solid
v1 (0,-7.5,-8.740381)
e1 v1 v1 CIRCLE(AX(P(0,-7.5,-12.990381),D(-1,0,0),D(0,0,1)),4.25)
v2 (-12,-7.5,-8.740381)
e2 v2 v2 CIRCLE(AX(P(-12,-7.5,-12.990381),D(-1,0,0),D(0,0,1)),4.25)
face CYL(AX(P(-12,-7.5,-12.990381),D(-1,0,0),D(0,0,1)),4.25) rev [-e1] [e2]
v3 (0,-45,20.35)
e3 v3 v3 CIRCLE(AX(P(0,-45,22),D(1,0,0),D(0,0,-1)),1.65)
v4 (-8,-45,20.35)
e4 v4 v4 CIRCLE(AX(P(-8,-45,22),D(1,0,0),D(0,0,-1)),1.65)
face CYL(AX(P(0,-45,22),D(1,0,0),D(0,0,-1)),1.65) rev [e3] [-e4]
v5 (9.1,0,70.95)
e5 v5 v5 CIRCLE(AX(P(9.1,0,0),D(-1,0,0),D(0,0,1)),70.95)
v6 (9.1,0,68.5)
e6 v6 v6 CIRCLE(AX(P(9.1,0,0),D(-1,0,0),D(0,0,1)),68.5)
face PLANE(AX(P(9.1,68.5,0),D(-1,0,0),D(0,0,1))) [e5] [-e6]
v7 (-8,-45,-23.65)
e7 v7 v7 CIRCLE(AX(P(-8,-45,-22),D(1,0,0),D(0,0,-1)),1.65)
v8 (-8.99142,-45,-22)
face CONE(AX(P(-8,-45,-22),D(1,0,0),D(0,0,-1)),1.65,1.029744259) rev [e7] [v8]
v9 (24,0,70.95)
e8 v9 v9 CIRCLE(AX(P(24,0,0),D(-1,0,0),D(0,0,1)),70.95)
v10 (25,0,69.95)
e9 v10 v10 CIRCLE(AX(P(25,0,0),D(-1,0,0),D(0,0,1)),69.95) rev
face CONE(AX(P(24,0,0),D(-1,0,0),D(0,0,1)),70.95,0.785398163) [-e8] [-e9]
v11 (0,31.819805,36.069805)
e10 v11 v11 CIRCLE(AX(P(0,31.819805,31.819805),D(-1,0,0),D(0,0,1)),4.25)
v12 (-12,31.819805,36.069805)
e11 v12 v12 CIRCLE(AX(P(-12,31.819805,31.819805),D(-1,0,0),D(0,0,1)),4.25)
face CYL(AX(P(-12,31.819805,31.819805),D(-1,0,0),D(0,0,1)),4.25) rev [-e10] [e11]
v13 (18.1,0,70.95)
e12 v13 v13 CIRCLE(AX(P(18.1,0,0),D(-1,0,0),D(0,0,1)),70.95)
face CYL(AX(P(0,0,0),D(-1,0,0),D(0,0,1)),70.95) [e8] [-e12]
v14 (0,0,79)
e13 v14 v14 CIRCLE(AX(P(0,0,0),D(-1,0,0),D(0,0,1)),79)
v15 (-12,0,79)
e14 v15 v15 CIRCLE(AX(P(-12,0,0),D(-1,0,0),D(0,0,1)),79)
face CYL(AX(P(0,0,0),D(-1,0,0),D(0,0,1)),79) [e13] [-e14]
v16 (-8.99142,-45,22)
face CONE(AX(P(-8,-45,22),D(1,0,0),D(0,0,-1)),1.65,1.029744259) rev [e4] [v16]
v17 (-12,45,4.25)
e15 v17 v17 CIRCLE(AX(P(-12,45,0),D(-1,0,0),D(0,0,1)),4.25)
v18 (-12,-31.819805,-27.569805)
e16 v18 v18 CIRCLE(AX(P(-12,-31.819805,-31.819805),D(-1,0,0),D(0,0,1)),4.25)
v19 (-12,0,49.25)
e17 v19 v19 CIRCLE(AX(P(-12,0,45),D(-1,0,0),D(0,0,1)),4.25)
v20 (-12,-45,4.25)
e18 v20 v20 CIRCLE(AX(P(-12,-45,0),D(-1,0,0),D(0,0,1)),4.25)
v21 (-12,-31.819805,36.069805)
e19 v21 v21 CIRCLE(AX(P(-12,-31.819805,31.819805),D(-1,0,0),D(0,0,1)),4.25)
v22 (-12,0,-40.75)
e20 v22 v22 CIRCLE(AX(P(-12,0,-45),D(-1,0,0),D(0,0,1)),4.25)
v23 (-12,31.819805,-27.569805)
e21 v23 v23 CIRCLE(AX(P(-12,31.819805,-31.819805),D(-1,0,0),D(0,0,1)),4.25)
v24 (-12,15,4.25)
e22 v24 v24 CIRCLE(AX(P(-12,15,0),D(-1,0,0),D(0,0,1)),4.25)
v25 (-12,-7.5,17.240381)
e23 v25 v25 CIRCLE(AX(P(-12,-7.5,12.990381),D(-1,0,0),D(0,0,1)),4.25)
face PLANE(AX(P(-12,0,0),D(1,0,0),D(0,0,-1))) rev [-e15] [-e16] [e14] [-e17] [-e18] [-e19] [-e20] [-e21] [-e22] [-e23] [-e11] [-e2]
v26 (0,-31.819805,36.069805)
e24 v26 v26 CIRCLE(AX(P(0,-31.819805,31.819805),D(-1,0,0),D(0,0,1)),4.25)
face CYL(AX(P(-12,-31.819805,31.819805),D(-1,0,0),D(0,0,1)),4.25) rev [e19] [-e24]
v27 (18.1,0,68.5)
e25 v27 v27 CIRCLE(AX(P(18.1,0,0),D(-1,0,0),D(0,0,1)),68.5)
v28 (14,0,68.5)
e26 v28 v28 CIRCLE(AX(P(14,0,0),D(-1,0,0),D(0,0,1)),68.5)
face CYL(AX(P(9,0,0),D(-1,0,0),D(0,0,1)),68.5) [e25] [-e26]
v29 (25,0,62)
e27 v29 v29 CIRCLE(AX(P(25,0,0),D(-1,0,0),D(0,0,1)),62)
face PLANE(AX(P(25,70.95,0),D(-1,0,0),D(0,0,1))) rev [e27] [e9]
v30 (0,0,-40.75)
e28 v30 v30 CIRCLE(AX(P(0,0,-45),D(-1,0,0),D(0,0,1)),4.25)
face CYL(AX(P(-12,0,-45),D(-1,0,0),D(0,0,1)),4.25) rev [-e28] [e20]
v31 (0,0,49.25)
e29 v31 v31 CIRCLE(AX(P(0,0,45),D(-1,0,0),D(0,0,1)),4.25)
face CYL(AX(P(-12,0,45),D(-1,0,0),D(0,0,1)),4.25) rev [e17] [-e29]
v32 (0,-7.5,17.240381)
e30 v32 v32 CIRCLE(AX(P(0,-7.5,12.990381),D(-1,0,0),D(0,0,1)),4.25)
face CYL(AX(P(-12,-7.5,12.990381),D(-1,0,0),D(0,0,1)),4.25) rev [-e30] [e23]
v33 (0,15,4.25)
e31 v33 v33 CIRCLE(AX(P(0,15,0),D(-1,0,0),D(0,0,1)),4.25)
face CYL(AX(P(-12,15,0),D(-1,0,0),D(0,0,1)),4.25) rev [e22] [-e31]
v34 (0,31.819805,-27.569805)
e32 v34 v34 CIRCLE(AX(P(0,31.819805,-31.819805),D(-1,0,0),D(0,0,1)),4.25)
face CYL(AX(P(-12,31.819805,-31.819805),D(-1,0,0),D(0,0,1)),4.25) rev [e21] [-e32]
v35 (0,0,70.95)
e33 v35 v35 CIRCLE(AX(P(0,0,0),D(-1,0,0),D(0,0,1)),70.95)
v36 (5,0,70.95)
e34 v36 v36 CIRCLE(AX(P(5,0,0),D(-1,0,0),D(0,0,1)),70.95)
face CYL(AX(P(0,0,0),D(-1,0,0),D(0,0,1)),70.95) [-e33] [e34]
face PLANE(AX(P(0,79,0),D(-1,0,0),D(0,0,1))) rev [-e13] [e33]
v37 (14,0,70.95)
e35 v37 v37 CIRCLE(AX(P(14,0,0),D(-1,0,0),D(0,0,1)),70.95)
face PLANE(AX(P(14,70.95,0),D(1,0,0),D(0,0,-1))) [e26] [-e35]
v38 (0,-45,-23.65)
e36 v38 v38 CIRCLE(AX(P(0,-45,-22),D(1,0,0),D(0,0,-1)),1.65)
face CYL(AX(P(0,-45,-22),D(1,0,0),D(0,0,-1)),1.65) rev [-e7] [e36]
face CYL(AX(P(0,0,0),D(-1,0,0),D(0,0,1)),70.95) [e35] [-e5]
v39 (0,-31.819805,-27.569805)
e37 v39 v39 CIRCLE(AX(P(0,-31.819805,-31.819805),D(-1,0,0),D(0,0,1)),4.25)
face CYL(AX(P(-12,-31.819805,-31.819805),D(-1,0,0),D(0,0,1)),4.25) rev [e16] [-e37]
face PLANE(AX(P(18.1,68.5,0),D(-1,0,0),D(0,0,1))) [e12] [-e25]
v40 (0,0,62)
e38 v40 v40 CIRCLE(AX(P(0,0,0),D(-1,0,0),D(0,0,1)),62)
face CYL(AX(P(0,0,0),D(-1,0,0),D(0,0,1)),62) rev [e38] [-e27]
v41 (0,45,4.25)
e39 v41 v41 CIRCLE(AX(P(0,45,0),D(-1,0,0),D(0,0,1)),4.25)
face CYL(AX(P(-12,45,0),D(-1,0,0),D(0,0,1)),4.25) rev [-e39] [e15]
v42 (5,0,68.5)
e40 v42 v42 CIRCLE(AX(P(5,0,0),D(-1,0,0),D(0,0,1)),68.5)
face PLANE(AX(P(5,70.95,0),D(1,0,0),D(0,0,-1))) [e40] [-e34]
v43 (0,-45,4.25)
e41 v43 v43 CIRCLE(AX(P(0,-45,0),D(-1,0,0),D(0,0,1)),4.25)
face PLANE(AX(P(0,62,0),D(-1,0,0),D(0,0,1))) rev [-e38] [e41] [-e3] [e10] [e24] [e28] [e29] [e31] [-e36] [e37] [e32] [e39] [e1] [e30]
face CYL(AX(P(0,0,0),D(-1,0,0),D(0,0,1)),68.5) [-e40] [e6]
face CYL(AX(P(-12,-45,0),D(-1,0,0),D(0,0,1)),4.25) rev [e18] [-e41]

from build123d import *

# Parameters (mm, degrees)
CHAMFER_963_SIZE             = 1
SKETCH_2_W                   = 4.1
SKETCH_2_H                   = 2.45
PATTERN_LINEAR_O_2_COUNT     = 2
PATTERN_LINEAR_O_2_PITCH     = 9
PATTERN_CIRCULAR_M10_COUNT   = 8
PATTERN_CIRCULAR_M10_2_COUNT = 3


# Read off the part's stored shape, not the designer's step: トレイ支柱 M4（内側）
with BuildPart() as part:
    # ｽｹｯﾁ1 → Revolve 926 (revolve)
    with BuildSketch(Plane.XY, mode=Mode.PRIVATE) as revolve_926_sk:
        Polygon((-12, 0), (-12, 79), (0, 79), (0, 70.95), (25, 70.95), (25, 62), (0, 62), (0, 0), align=None)
    revolve(revolve_926_sk.sketch.rotate(Axis((0, 0, 0), (1, 0, 0)), 90), axis=Axis((0, 0, 0), (1, 0, 0)))

    # Chamfer 963
    chamfer_963_edges = [part.edges().sort_by_distance(p)[0] for p in [
        (25, 0, -70.95),
    ]]
    chamfer(chamfer_963_edges, length=CHAMFER_963_SIZE)

    # ｽｹｯﾁ2 → Oリング溝入れ G-135 (revolve, cut)
    with BuildSketch(Plane.XY, mode=Mode.PRIVATE) as o_g_135_sk:
        with Locations((7.05, 69.725)):
            Rectangle(SKETCH_2_W, SKETCH_2_H)
    o_g_135 = revolve(o_g_135_sk.sketch.rotate(Axis((0, 0, 0), (1, 0, 0)), 90), axis=Axis((0, 0, 0), (1, 0, 0)), mode=Mode.SUBTRACT)

    # Oリング溝 2 本目: Oリング溝入れ G-135 ×2
    with Locations(*[(i * PATTERN_LINEAR_O_2_PITCH, 0, 0) for i in range(1, PATTERN_LINEAR_O_2_COUNT)]):
        add(o_g_135, mode=Mode.SUBTRACT)

    # ｽｹｯﾁ3 → Hole Wizard M10 (revolve, cut)
    with BuildSketch(Plane(origin=(-12, 45, 0), x_dir=(0, 0, 1), z_dir=(0, 1, 0))):
        Polygon((0, 0), (0, 15.553657631), (4.25, 13), (4.25, 0), align=None)
    hole_wizard_m10 = revolve(axis=Axis((-18.35, 45, 0), (1, 0, 0)), mode=Mode.SUBTRACT)

    # Pattern Circular M10: Hole Wizard M10 ×8 about axis
    pattern_circular_m10_axis = Axis((0, 0, 0), (1, 0, 0))
    for i in range(1, PATTERN_CIRCULAR_M10_COUNT):
        add(hole_wizard_m10.rotate(pattern_circular_m10_axis, i * 360 / PATTERN_CIRCULAR_M10_COUNT), mode=Mode.SUBTRACT)

    # ｽｹｯﾁ5 → Hole Wizard M10 2 (revolve, cut)
    with BuildSketch(Plane(origin=(-12, 15, 0), x_dir=(0, 0, 1), z_dir=(0, 1, 0))):
        Polygon((0, 0), (0, 15.553657631), (4.25, 13), (4.25, 0), align=None)
    hole_wizard_m10_2 = revolve(axis=Axis((-18.35, 15, 0), (1, 0, 0)), mode=Mode.SUBTRACT)

    # Pattern Circular M10 2: Hole Wizard M10 2 ×3 about axis
    pattern_circular_m10_2_axis = Axis((0, 0, 0), (1, 0, 0))
    for i in range(1, PATTERN_CIRCULAR_M10_2_COUNT):
        add(hole_wizard_m10_2.rotate(pattern_circular_m10_2_axis, i * 360 / PATTERN_CIRCULAR_M10_2_COUNT), mode=Mode.SUBTRACT)

    # トレイ支柱 M4（内側） outline → トレイ支柱 M4（内側） (revolve, cut)
    with BuildSketch(Plane(origin=(0, -45, 22), x_dir=(0, 1, 0), z_dir=(0, 0, -1))):
        Polygon((0, 0), (0, -8.991420021), (1.65, -8), (1.65, 0), align=None)
    hole_wizard_m4 = revolve(axis=Axis((0, -45, 22), (1, 0, 0)), mode=Mode.SUBTRACT)

    # トレイ支柱 M4（内側・対称）: トレイ支柱 M4（内側） across plane
    add(hole_wizard_m4.mirror(Plane.XY), mode=Mode.SUBTRACT)


solid = part.part
